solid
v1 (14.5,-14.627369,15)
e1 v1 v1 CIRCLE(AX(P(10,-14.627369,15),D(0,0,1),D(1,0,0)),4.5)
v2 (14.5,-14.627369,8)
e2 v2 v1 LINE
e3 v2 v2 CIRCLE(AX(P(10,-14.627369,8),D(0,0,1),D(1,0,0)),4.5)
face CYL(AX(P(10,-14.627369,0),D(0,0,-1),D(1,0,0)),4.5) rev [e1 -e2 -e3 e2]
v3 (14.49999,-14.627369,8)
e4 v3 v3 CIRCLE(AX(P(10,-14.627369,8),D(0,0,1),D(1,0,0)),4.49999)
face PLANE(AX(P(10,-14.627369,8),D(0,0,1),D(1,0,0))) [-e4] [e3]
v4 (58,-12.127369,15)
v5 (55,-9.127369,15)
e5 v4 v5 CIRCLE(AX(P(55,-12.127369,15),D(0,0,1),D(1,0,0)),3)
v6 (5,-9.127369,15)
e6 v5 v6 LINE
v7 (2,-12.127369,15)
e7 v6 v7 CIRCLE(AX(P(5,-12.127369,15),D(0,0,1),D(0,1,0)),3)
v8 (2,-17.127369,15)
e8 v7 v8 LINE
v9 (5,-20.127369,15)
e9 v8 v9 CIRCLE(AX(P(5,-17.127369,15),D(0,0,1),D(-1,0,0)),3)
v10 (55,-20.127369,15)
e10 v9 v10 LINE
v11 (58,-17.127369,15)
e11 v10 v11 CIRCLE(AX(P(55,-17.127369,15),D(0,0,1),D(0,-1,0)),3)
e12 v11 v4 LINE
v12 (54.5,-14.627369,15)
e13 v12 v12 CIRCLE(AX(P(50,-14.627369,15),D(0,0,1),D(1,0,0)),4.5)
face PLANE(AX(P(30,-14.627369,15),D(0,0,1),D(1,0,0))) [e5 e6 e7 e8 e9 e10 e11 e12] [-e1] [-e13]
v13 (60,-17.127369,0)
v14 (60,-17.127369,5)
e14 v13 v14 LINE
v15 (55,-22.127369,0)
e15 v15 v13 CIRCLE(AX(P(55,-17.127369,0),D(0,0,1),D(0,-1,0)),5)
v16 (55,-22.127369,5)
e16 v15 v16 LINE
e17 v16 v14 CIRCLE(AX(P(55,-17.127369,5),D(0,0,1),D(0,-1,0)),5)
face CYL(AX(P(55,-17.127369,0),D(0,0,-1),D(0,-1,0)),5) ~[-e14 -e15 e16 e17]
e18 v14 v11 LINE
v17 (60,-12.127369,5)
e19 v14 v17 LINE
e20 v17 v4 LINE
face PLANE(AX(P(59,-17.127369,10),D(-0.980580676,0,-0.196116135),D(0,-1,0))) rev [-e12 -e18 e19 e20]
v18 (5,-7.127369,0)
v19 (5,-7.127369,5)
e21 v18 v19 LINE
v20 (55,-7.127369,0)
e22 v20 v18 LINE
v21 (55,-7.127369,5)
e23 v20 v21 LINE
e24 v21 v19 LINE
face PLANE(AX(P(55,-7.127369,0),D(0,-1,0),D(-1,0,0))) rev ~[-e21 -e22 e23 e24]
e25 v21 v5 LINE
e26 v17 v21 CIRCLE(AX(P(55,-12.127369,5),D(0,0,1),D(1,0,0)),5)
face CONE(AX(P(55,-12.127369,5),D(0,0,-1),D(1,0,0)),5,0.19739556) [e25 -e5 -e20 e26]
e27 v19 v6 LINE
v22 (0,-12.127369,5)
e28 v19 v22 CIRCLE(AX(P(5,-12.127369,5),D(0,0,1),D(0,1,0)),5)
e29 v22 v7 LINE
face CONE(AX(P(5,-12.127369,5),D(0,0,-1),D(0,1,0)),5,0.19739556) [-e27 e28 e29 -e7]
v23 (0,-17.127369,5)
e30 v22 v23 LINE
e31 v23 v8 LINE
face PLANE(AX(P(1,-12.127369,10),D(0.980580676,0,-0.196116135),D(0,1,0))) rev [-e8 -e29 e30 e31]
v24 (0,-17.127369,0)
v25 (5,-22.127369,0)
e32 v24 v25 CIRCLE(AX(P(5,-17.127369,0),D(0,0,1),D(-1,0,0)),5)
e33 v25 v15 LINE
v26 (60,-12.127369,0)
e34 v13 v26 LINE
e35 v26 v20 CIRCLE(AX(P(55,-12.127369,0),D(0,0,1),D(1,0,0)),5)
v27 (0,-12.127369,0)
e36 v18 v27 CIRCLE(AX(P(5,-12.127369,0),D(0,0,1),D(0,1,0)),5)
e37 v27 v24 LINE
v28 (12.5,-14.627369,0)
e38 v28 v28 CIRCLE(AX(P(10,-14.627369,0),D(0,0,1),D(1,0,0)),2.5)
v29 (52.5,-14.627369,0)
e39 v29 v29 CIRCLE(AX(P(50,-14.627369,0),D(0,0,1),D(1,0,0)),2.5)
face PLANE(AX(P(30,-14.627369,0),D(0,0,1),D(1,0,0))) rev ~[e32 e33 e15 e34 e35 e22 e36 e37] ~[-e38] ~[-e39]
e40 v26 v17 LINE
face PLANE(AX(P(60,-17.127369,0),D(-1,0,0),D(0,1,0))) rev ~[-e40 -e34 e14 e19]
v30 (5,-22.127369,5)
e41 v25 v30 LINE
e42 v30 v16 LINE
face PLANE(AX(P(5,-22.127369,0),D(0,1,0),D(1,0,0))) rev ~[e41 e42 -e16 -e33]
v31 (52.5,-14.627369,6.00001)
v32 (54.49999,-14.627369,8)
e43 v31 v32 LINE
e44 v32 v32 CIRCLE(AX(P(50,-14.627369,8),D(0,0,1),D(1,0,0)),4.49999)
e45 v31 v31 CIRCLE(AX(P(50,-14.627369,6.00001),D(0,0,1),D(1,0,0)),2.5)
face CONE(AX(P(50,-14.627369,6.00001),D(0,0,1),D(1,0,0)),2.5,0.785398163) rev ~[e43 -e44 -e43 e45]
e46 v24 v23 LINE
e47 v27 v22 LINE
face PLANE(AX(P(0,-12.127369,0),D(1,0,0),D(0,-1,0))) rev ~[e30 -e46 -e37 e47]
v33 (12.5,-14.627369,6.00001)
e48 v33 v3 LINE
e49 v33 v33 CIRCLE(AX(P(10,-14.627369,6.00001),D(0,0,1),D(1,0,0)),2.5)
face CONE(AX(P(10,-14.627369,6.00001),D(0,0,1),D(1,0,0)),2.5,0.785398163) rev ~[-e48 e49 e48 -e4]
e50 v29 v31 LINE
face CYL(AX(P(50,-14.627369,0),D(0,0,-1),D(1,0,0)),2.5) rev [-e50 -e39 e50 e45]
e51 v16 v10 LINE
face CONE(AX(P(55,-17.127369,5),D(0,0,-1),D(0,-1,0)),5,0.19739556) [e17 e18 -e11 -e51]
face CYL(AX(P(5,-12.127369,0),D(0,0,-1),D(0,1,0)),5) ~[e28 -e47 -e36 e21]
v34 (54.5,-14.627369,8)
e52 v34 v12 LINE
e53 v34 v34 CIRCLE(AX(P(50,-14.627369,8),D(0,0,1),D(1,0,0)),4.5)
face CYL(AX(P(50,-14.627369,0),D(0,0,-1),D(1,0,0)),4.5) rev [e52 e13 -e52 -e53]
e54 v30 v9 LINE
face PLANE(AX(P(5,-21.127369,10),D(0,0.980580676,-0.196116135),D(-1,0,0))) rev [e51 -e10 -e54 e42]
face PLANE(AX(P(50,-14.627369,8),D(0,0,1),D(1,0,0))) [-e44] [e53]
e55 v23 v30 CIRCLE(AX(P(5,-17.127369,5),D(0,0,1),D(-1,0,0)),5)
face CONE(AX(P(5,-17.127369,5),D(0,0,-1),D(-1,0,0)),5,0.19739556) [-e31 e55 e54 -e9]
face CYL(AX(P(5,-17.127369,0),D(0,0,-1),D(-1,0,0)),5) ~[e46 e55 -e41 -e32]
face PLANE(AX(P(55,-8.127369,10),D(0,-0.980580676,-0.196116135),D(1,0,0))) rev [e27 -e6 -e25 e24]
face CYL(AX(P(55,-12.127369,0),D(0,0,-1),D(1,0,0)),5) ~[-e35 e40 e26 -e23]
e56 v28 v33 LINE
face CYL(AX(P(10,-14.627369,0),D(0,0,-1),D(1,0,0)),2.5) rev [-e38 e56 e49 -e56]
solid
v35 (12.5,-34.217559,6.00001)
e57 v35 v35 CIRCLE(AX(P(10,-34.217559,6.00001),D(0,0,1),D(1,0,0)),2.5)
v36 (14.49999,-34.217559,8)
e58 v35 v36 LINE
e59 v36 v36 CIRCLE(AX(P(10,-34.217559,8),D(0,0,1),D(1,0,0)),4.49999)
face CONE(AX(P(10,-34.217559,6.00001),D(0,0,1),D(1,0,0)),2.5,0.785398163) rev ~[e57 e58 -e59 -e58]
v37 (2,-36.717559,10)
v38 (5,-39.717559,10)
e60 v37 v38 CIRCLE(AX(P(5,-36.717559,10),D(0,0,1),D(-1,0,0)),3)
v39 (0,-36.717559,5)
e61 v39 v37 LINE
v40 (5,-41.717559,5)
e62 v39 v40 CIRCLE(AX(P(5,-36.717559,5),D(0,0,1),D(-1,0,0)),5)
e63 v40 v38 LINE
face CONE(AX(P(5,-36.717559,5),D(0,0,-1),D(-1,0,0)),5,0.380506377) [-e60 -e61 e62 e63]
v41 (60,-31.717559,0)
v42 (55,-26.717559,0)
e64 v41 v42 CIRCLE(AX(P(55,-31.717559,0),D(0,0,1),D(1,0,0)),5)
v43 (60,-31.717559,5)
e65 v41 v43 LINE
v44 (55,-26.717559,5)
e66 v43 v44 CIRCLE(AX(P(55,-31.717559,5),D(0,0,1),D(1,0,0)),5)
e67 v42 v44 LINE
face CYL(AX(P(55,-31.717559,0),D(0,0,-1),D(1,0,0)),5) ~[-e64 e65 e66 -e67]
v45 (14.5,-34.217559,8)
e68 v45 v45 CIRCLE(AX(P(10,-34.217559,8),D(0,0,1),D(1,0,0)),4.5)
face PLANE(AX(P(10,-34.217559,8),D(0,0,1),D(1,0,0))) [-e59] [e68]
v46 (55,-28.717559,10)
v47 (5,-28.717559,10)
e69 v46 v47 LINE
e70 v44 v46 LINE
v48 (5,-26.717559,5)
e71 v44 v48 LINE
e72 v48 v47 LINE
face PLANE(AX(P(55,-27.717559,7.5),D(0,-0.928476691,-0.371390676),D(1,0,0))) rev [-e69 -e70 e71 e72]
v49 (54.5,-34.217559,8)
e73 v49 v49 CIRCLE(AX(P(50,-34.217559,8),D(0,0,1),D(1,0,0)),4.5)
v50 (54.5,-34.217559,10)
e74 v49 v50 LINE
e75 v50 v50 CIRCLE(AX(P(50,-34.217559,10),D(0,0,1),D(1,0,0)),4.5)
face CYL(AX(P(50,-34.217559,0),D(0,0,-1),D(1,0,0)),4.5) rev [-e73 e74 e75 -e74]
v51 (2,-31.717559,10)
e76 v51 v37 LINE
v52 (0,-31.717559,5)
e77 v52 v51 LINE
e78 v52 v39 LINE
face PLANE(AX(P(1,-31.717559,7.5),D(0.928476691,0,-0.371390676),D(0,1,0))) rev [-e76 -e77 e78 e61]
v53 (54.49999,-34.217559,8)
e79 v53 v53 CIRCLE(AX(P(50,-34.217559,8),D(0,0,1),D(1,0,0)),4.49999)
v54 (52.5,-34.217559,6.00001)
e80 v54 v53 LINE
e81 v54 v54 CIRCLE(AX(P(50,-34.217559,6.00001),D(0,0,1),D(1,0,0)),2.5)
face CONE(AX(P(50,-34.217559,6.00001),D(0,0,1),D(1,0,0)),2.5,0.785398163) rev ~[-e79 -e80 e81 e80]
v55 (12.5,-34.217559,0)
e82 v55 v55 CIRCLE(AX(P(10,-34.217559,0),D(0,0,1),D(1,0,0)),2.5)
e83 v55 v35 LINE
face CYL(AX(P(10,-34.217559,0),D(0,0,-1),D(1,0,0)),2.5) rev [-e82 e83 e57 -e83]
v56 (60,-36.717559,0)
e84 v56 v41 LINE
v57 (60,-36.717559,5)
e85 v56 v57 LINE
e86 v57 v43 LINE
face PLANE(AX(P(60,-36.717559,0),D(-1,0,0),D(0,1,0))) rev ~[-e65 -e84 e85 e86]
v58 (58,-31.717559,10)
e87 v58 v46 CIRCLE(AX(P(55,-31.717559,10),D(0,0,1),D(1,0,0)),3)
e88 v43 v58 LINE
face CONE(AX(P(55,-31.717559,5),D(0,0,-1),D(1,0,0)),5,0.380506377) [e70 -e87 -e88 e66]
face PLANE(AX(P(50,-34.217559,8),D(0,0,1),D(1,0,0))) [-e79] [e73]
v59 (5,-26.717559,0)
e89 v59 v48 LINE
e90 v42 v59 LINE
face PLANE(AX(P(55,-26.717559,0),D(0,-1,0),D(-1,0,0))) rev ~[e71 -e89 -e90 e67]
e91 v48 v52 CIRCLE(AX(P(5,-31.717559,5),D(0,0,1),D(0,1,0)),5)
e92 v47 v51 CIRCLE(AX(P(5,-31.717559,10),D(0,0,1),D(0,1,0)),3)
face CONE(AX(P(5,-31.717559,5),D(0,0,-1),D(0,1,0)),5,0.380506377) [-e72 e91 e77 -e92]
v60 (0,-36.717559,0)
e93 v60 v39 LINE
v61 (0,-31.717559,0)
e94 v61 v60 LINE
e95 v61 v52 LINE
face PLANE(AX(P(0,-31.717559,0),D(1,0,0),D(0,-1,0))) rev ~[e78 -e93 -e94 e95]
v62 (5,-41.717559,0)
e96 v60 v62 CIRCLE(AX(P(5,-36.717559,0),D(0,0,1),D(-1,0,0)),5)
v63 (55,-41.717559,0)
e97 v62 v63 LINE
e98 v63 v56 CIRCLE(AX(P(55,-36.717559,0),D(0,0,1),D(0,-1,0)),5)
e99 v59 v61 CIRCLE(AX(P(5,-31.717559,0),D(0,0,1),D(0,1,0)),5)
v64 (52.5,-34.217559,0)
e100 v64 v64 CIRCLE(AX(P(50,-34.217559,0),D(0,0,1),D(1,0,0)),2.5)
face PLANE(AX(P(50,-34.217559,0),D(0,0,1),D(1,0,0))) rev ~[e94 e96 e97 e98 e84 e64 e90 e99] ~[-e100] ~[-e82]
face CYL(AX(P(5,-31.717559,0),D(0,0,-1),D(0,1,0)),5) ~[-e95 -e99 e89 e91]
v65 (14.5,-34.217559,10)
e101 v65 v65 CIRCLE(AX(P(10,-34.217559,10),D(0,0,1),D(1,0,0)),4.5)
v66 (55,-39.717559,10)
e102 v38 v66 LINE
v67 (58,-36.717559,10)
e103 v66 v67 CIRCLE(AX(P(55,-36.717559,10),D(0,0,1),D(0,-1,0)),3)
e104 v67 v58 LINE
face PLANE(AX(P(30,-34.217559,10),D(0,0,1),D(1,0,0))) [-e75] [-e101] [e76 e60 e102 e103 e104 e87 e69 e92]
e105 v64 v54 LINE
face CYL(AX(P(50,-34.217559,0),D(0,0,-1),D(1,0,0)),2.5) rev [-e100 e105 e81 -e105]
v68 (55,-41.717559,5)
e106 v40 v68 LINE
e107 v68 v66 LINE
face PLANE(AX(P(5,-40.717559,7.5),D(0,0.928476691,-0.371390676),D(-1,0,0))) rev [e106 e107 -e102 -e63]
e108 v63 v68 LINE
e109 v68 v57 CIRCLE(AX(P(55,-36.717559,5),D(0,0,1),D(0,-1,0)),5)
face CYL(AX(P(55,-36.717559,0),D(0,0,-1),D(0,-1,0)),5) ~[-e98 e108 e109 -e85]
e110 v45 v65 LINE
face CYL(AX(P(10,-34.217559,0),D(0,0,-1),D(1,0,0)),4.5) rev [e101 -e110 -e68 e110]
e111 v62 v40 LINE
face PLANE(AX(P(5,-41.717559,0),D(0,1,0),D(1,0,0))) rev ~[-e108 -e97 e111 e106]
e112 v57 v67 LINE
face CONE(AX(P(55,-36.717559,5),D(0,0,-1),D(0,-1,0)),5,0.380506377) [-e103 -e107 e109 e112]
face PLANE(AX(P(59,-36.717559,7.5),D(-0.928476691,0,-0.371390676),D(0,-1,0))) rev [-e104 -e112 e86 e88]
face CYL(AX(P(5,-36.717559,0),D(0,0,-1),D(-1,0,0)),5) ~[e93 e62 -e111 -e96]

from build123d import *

# Parameters (mm, degrees)
F0_R      = 4.5
F1_DEPTH  = 10
F0_R_2    = 2.5
F2_DEPTH  = 8
F3_SIZE2  = 2
F3_SIZE   = 5
F4_SIZE   = 1.99999
F4_2_SIZE = 1.99999
F4_3_SIZE = 1.99999
F5_DEPTH  = 15
F6_SIZE2  = 2
F6_SIZE   = 10


# Not quite as in the source:
# - a fillet or chamfer is up to 0.001 mm smaller than in the source, because OpenCascade refuses the exact size
# - a feature names something its author has since deleted; it is built from what else it names


with BuildPart() as f1:
    # F0 (on Top) → F1 (new body)
    with BuildSketch(Plane.XY):
        with BuildLine():
            Line((55, -26.7175590992), (5, -26.7175590992))
            ThreePointArc((5, -26.7175590992), (1.4644660941, -28.1820251933), (0, -31.7175590992))
            Line((0, -31.7175590992), (0, -36.7175590992))
            ThreePointArc((0, -36.7175590992), (1.4644660941, -40.2530930051), (5, -41.7175590992))
            Line((5, -41.7175590992), (55, -41.7175590992))
            ThreePointArc((55, -41.7175590992), (58.5355339059, -40.2530930051), (60, -36.7175590992))
            Line((60, -36.7175590992), (60, -31.7175590992))
            ThreePointArc((60, -31.7175590992), (58.5355339059, -28.1820251933), (55, -26.7175590992))
        make_face()
        with Locations((10, -34.2175590992)):
            Circle(F0_R, mode=Mode.SUBTRACT)
        with Locations((50, -34.2175590992)):
            Circle(F0_R, mode=Mode.SUBTRACT)
    extrude(amount=F1_DEPTH)

    # F0 (on Top) → F2 (join)
    with BuildSketch(Plane.XY):
        with Locations((50, -34.2175590992)):
            Circle(F0_R)
        with Locations((50, -34.2175590992)):
            Circle(F0_R_2, mode=Mode.SUBTRACT)
        with Locations((10, -34.2175590992)):
            Circle(F0_R)
        with Locations((10, -34.2175590992)):
            Circle(F0_R_2, mode=Mode.SUBTRACT)
    extrude(amount=F2_DEPTH)

    # F3
    f3_edges = [f1.edges().sort_by_distance(p)[0] for p in [
        (30, -26.717559, 10),
    ]]
    f3_side = f1.faces().sort_by_distance((30, -26.717559, 5))[0]
    chamfer(f3_edges, length=F3_SIZE, length2=F3_SIZE2, reference=f3_side)

    # F4 (size 2 in the source; OpenCascade refuses exactly that, so slightly less here)
    f4_edges = [f1.edges().sort_by_distance(p)[0] for p in [
        (47.5, -34.217559, 8),
        (7.5, -34.217559, 8),
    ]]
    chamfer(f4_edges, length=F4_SIZE)


with BuildPart() as f2:
    # F0 (on Top) → F2, piece 2 (new body)
    with BuildSketch(Plane.XY):
        with Locations((10, -14.6273694187)):
            Circle(F0_R)
        with Locations((10, -14.6273694187)):
            Circle(F0_R_2, mode=Mode.SUBTRACT)
    extrude(amount=F2_DEPTH)

    # F4#2 (size 2 in the source; OpenCascade refuses exactly that, so slightly less here)
    f4_2_edges = [f2.edges().sort_by_distance(p)[0] for p in [
        (7.5, -14.627369, 8),
    ]]
    chamfer(f4_2_edges, length=F4_2_SIZE)



with BuildPart() as f2b:
    # F0 (on Top) → F2, piece 3 (new body)
    with BuildSketch(Plane.XY):
        with Locations((50, -14.6273694187)):
            Circle(F0_R)
        with Locations((50, -14.6273694187)):
            Circle(F0_R_2, mode=Mode.SUBTRACT)
    extrude(amount=F2_DEPTH)

    # F4#3 (size 2 in the source; OpenCascade refuses exactly that, so slightly less here)
    f4_3_edges = [f2b.edges().sort_by_distance(p)[0] for p in [
        (47.5, -14.627369, 8),
    ]]
    chamfer(f4_3_edges, length=F4_3_SIZE)


with BuildPart() as f2_1:
    add(f2.part)

    add(f2b.part)  # F5 merges F2b
    # F0 (on Top) → F5 (join)
    with BuildSketch(Plane.XY):
        with BuildLine():
            Line((55, -7.1273694187), (5, -7.1273694187))
            ThreePointArc((5, -7.1273694187), (1.4644660941, -8.5918355128), (0, -12.1273694187))
            Line((0, -12.1273694187), (0, -17.1273694187))
            ThreePointArc((0, -17.1273694187), (1.4644660941, -20.6629033247), (5, -22.1273694187))
            Line((5, -22.1273694187), (55, -22.1273694187))
            ThreePointArc((55, -22.1273694187), (58.5355339059, -20.6629033247), (60, -17.1273694187))
            Line((60, -17.1273694187), (60, -12.1273694187))
            ThreePointArc((60, -12.1273694187), (58.5355339059, -8.5918355128), (55, -7.1273694187))
        make_face()
        with Locations((10, -14.6273694187)):
            Circle(F0_R, mode=Mode.SUBTRACT)
        with Locations((50, -14.6273694187)):
            Circle(F0_R, mode=Mode.SUBTRACT)
    extrude(amount=F5_DEPTH)

    # F6
    f6_edges = [f2_1.edges().sort_by_distance(p)[0] for p in [
        (30, -7.127369, 15),
    ]]
    f6_side = f2_1.faces().sort_by_distance((30, -7.127369, 7.5))[0]
    chamfer(f6_edges, length=F6_SIZE, length2=F6_SIZE2, reference=f6_side)


solid = Compound([f1.part, f2_1.part])
